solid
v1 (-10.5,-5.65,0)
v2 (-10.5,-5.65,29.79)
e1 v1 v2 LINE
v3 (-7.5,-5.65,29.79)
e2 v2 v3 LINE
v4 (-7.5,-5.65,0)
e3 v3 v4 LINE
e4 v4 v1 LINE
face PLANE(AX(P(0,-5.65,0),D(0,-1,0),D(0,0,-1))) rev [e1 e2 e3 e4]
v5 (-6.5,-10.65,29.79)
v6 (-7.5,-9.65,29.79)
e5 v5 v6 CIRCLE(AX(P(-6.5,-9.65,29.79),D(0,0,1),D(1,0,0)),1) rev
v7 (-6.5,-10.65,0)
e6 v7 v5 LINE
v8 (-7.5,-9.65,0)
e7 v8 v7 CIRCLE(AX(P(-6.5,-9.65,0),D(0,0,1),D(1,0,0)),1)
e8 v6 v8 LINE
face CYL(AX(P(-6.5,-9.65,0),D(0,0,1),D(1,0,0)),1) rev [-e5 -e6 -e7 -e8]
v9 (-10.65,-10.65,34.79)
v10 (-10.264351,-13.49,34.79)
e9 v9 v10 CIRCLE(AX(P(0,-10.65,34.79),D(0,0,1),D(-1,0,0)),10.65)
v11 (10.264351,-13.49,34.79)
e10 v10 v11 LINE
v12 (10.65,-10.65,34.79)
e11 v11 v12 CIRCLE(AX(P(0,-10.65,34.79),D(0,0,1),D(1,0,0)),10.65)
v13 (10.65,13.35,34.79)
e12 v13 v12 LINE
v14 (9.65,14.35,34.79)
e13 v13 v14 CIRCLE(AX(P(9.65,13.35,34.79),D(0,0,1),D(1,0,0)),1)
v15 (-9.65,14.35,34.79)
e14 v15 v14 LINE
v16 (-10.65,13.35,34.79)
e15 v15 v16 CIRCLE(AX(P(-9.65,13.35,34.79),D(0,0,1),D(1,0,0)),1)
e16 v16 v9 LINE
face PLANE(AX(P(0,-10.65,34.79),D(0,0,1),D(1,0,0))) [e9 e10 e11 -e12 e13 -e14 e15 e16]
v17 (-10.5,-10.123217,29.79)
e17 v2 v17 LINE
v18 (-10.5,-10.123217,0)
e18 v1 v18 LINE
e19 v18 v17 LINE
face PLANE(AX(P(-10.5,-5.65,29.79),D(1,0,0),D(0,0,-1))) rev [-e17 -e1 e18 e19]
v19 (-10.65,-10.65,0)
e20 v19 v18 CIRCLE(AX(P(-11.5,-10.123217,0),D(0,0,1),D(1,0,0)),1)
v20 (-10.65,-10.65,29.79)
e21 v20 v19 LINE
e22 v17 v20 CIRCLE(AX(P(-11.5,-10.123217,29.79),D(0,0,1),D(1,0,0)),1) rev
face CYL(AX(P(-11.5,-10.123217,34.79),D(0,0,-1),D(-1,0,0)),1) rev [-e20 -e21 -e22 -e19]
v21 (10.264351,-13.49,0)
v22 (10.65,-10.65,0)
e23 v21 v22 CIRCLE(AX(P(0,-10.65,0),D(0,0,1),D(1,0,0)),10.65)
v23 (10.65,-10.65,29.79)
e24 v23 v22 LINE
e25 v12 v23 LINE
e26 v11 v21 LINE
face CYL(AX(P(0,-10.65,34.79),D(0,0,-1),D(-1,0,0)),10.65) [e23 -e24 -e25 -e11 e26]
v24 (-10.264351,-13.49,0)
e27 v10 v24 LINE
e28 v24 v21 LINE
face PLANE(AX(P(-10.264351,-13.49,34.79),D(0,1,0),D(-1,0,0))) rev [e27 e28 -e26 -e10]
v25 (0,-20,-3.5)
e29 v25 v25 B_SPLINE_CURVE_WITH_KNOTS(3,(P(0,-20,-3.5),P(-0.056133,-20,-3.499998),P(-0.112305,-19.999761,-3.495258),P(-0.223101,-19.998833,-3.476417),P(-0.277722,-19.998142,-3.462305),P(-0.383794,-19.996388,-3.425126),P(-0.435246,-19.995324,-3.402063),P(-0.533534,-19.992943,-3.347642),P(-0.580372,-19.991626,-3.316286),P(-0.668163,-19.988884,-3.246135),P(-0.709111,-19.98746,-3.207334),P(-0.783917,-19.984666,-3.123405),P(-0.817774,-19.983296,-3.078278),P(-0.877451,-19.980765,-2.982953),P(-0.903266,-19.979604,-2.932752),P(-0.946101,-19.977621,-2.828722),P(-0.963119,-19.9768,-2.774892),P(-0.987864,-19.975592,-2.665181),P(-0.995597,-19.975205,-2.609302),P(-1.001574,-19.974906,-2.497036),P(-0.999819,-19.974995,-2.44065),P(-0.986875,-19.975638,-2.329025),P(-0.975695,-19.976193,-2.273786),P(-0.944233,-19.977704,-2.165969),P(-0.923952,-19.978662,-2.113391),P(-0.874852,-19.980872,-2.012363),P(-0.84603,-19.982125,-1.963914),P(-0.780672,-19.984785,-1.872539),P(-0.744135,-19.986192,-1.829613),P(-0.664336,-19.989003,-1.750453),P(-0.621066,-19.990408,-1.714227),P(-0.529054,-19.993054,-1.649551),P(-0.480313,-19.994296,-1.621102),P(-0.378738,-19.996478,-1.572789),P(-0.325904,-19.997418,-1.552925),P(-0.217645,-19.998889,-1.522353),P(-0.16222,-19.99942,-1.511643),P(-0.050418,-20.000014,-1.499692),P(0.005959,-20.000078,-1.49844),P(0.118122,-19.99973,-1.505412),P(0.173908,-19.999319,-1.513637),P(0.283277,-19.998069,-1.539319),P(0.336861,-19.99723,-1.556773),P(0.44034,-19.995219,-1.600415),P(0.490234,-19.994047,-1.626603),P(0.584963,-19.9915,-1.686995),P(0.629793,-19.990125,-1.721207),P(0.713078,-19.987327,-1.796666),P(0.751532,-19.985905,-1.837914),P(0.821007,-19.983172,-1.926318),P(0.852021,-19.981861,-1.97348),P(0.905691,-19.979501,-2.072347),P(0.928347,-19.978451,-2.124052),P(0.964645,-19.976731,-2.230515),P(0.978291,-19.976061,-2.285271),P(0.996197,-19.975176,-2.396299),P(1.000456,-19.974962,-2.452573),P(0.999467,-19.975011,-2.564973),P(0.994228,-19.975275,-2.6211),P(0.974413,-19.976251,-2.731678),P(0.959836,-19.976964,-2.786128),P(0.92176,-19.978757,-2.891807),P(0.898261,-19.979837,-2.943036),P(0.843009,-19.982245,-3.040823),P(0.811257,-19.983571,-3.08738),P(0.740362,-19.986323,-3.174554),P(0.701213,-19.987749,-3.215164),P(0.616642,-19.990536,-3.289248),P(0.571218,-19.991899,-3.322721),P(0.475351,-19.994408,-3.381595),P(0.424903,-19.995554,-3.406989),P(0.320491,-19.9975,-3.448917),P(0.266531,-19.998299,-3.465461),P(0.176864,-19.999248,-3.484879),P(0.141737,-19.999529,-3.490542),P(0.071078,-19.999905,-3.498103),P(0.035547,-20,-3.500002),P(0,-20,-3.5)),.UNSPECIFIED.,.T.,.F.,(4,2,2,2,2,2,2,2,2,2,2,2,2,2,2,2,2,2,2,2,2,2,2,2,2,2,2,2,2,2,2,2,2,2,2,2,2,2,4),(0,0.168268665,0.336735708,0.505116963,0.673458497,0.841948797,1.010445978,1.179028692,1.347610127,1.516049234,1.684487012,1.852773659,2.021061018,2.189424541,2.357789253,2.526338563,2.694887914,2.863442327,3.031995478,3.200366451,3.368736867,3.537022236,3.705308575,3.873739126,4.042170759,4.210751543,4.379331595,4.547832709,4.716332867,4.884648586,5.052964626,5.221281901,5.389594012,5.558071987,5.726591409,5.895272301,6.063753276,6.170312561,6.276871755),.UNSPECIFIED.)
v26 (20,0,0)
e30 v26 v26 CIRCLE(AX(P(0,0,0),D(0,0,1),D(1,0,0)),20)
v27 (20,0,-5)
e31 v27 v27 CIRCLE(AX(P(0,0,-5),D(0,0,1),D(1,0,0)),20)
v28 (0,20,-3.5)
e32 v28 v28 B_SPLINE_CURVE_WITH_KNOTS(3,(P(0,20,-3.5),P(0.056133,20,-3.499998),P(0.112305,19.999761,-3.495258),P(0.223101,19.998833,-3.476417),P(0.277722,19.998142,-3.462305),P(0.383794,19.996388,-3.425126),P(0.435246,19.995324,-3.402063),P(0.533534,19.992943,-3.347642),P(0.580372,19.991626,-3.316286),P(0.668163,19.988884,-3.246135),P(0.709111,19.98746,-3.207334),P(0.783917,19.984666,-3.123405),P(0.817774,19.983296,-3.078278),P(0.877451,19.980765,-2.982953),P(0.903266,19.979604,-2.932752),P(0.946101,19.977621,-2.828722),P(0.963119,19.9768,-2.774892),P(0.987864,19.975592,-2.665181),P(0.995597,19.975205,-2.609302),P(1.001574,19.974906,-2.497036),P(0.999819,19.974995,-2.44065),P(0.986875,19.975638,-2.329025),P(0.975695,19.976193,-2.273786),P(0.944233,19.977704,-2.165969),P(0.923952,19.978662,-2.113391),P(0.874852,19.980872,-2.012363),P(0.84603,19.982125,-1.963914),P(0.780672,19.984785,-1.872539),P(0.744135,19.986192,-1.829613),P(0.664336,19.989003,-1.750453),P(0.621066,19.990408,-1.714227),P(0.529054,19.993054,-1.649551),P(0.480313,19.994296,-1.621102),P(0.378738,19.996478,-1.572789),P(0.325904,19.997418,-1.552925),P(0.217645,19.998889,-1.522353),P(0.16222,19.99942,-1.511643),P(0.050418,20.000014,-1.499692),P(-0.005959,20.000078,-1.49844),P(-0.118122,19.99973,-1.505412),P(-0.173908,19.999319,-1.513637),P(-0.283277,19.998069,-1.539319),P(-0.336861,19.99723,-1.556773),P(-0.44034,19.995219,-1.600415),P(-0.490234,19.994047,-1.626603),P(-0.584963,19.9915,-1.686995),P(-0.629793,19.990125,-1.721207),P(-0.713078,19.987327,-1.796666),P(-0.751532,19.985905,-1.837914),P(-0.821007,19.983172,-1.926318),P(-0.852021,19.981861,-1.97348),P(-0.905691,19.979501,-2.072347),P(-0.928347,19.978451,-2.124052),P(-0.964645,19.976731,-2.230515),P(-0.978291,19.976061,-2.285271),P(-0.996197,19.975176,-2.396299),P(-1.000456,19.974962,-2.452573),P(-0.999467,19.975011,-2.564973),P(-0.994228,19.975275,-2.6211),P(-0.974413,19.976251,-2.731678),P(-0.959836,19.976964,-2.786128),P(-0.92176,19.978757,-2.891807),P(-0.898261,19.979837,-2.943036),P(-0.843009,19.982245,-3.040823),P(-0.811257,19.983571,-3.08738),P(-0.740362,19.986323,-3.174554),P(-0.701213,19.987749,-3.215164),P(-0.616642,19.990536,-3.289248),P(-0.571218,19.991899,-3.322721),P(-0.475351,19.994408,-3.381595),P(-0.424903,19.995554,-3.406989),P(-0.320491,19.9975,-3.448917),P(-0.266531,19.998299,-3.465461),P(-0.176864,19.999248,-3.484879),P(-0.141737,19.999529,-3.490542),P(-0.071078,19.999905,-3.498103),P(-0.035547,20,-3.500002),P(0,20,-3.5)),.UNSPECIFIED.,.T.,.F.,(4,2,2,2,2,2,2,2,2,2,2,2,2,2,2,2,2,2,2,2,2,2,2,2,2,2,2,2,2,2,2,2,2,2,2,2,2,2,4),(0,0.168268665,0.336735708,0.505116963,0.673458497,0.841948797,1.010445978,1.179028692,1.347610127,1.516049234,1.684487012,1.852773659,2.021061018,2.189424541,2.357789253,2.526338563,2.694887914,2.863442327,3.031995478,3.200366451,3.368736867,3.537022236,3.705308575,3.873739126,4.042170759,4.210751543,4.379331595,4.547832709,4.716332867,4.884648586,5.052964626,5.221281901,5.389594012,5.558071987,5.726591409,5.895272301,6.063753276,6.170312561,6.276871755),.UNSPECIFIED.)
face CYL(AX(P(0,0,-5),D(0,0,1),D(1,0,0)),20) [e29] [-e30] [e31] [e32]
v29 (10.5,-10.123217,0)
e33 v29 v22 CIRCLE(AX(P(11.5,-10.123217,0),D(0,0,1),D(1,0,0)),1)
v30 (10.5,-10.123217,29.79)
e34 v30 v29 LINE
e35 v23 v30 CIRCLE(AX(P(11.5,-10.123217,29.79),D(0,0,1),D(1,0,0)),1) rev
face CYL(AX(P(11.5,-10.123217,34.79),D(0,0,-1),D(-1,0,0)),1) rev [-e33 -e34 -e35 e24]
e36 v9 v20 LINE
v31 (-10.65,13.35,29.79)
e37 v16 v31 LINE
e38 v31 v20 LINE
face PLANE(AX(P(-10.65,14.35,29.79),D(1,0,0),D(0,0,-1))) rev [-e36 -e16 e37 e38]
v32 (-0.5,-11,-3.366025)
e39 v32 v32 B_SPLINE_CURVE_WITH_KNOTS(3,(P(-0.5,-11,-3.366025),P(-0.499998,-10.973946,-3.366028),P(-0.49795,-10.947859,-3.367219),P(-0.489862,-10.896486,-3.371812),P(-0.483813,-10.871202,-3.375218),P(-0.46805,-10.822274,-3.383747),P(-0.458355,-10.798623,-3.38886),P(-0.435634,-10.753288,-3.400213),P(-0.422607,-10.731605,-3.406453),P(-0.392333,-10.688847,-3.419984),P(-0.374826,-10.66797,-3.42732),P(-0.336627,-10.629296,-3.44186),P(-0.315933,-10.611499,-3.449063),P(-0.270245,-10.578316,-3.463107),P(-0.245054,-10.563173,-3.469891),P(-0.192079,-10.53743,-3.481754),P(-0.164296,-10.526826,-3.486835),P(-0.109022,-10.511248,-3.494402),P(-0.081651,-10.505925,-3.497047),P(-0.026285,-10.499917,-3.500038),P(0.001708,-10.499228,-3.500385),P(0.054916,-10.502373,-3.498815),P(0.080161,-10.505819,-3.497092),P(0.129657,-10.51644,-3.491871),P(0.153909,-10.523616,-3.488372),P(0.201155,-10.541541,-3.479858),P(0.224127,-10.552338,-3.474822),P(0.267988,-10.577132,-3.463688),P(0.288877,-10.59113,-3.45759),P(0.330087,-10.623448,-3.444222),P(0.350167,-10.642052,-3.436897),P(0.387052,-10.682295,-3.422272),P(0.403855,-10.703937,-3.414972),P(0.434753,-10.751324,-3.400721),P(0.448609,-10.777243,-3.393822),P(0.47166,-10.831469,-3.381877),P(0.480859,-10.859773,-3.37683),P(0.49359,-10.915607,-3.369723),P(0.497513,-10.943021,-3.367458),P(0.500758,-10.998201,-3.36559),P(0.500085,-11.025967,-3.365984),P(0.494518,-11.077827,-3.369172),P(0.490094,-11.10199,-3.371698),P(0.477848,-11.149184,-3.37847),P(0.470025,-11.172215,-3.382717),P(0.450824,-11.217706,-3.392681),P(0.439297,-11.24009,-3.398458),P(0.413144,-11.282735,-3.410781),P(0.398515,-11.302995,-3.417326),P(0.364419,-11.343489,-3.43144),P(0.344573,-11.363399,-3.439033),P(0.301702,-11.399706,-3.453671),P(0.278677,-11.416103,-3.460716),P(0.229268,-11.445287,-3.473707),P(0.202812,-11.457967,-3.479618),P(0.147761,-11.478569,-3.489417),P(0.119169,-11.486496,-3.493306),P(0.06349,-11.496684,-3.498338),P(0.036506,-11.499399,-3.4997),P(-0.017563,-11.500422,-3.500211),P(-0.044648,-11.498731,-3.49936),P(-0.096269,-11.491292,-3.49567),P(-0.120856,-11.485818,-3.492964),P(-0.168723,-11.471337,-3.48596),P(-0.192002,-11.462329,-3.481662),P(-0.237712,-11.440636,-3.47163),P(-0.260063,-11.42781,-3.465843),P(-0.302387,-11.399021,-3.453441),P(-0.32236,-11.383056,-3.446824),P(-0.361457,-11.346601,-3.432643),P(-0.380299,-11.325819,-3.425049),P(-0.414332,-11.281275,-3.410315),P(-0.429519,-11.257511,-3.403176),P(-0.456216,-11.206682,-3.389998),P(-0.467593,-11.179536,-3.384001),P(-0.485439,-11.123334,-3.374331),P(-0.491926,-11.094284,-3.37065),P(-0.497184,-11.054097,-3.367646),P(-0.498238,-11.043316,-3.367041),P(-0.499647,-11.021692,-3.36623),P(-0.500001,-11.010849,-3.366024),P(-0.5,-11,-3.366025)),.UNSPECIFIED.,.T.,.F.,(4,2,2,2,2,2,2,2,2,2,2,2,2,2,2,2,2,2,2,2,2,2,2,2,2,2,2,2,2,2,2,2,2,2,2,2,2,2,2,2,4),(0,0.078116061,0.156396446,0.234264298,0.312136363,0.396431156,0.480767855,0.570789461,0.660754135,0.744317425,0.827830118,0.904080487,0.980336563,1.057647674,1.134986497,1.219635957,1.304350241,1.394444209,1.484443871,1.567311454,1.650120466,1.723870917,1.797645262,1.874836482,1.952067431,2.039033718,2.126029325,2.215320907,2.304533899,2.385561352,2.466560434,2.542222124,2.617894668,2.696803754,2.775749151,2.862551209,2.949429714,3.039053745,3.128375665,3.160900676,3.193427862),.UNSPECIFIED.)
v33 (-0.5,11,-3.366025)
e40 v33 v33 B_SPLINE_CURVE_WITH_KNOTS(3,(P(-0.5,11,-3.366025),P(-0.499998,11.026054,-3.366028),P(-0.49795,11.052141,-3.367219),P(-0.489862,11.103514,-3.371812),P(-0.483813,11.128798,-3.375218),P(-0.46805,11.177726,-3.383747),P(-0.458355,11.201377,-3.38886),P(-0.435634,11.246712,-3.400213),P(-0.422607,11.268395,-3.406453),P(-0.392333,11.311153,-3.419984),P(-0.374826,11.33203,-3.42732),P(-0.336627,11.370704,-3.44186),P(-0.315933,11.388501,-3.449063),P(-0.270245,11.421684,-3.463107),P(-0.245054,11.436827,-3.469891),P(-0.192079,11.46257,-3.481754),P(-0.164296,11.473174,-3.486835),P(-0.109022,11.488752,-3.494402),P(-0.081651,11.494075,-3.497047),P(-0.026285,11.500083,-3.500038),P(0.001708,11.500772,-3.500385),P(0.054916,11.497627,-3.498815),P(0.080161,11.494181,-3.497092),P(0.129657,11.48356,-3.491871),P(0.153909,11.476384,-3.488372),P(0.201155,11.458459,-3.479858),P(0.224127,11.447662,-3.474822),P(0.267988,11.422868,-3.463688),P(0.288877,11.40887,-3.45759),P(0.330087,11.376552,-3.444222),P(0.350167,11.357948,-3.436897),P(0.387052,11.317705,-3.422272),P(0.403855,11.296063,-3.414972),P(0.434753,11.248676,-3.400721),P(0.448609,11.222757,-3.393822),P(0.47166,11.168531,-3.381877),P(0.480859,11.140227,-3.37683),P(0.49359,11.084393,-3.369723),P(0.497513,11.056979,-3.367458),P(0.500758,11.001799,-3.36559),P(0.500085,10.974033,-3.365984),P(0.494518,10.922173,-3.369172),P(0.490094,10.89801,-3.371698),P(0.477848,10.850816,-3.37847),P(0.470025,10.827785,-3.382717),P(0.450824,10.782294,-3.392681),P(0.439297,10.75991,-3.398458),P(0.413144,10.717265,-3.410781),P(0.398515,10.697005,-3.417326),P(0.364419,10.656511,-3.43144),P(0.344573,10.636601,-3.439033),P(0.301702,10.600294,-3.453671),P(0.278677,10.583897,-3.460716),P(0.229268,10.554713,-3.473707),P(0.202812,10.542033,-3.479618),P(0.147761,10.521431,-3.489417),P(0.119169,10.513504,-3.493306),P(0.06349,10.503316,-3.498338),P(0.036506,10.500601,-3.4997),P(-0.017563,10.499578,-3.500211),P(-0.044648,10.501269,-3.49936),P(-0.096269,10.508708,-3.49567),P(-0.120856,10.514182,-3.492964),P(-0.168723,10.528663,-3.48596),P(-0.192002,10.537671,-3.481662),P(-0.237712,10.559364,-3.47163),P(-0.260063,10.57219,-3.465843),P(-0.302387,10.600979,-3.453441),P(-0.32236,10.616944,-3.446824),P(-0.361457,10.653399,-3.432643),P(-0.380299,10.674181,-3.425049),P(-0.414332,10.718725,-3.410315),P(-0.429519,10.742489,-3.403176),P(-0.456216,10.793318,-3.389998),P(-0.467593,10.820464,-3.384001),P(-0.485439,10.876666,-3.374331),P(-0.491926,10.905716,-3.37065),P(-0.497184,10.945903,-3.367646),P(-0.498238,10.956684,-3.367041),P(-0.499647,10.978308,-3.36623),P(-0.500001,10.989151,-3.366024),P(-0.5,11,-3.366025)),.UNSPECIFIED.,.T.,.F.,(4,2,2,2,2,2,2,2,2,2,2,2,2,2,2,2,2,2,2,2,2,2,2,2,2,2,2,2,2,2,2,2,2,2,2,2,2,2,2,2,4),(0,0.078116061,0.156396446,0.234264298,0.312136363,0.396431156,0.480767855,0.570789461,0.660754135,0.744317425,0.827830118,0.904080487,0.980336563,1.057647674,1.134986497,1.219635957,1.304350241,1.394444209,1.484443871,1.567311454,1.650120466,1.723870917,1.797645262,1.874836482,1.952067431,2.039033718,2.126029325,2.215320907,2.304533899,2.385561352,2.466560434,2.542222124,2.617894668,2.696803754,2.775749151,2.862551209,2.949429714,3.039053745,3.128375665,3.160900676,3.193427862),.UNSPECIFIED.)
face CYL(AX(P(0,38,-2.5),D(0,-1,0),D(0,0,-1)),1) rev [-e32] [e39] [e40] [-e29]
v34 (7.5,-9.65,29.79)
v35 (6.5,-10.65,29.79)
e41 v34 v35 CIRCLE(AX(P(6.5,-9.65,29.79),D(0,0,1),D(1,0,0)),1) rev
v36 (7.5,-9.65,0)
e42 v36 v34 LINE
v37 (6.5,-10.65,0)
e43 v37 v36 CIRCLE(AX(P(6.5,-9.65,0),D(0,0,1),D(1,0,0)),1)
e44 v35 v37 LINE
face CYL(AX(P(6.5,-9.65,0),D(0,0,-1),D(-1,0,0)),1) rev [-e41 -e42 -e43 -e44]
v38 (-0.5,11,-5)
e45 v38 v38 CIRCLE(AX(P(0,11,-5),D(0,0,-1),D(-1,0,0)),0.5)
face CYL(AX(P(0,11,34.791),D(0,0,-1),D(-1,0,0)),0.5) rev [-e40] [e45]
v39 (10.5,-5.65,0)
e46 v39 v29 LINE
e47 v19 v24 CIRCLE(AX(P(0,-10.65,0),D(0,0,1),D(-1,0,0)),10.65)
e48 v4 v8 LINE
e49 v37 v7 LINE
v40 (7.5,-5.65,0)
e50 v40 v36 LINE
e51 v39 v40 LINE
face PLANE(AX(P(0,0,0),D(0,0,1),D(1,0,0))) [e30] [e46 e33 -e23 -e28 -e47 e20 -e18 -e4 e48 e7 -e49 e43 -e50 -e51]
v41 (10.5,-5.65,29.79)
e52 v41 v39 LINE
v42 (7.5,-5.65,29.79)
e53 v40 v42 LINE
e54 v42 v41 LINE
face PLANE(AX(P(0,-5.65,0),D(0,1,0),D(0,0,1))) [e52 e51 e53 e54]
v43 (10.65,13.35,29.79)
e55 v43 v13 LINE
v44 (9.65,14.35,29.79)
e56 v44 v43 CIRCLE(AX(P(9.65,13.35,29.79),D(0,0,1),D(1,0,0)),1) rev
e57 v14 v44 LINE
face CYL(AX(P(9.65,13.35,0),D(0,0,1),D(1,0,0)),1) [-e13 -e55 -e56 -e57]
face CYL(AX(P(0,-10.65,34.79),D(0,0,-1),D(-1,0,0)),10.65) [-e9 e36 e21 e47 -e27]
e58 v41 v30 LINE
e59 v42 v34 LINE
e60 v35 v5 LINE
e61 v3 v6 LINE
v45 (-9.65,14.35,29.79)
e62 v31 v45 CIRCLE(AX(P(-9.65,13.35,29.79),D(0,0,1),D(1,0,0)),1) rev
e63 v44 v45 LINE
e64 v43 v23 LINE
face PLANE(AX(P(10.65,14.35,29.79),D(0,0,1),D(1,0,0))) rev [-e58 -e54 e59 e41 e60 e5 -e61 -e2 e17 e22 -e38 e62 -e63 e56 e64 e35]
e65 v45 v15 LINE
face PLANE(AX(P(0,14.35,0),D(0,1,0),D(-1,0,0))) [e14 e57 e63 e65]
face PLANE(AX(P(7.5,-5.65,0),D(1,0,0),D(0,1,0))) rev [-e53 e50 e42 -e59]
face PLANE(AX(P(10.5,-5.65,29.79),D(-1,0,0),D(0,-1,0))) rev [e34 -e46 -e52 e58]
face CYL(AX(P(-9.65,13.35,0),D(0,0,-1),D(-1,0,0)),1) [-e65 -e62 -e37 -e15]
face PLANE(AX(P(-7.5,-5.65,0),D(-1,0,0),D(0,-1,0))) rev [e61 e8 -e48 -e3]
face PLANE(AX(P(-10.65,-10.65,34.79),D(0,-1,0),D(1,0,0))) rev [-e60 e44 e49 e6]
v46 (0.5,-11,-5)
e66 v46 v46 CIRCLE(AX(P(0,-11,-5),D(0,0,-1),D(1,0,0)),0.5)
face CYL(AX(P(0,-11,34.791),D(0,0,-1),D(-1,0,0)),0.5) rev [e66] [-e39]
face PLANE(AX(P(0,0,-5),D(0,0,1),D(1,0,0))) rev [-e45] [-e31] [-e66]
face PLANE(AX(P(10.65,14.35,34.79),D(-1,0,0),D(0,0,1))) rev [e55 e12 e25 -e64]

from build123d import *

# Parameters (mm, degrees)
SKETCH1_R               = 20
BOSS_EXTRUDE1_DEPTH     = 5
BOSS_EXTRUDE2_DEPTH     = 34.79
SKETCH3_W               = 21.3
SKETCH3_H               = 5
BOSS_EXTRUDE3_DEPTH     = 25
SKETCH4_W               = 3
SKETCH4_H               = 29.79
BOSS_EXTRUDE5_DEPTH     = 5
CUT_EXTRUDE1_DEPTH      = 38
CUT_EXTRUDE1_DEPTH_BACK = 45.836860952
SKETCH5_R               = 1
FILLET1_R               = 1
FILLET2_R               = 1
FILLET3_R               = 1
CUT_EXTRUDE2_REACH      = 50.818
CUT_EXTRUDE2_END_RADIUS = 1
SKETCH6_R               = 0.5


with BuildPart() as part:
    # Sketch1 → Boss-Extrude1 (new body)
    with BuildSketch(Plane.XY):
        Circle(SKETCH1_R)
    extrude(amount=-BOSS_EXTRUDE1_DEPTH)

    # Sketch2 → Boss-Extrude2 (add)
    with BuildSketch(Plane.XY):
        with BuildLine():
            Line((-10.65, -10.65), (10.65, -10.65))
            ThreePointArc((10.65, -10.65), (10.553147336, -12.083032205), (10.264350929, -13.49))
            Line((10.264350929, -13.49), (-10.264350929, -13.49))
            ThreePointArc((-10.264350929, -13.49), (-10.553147336, -12.083032205), (-10.65, -10.65))
        make_face()
    extrude(amount=BOSS_EXTRUDE2_DEPTH)

    # Sketch3 → Boss-Extrude3 (add)
    with BuildSketch(Plane(origin=(0, -10.65, 0), x_dir=(1, 0, 0), z_dir=(0, 1, 0))):
        with Locations((0, -32.29)):
            Rectangle(SKETCH3_W, SKETCH3_H)
    extrude(amount=BOSS_EXTRUDE3_DEPTH)

    # Sketch4 → Boss-Extrude5 (add)
    with BuildSketch(Plane(origin=(0, -10.65, 0), x_dir=(1, 0, 0), z_dir=(0, 1, 0))):
        with Locations((9, -14.895)):
            Rectangle(SKETCH4_W, SKETCH4_H)
        with Locations((-9, -14.895)):
            Rectangle(SKETCH4_W, SKETCH4_H)
    extrude(amount=BOSS_EXTRUDE5_DEPTH)

    # Sketch5 → Cut-Extrude1 (cut, two sides: drawn at the far end of the back side and taken through both)
    with BuildSketch(Plane(origin=(0, 0, 0), x_dir=(1, 0, 0), z_dir=(0, 1, 0)).offset(-CUT_EXTRUDE1_DEPTH_BACK)):
        with Locations(Location((0, 2.5, 0), (0, 0, 90))):
            Circle(SKETCH5_R)
    extrude(amount=CUT_EXTRUDE1_DEPTH + CUT_EXTRUDE1_DEPTH_BACK, mode=Mode.SUBTRACT)

    # Fillet1
    fillet1_edges = [part.edges().sort_by_distance(p)[0] for p in [
        (10.65, 14.35, 32.29),
        (-10.65, 14.35, 32.29),
    ]]
    fillet(fillet1_edges, radius=FILLET1_R)

    # Fillet2
    fillet2_edges = [part.edges().sort_by_distance(p)[0] for p in [
        (7.5, -10.65, 14.895),
        (-7.5, -10.65, 14.895),
    ]]
    fillet(fillet2_edges, radius=FILLET2_R)

    # Fillet3
    # the kernel refuses this fillet: 1 mm, written as the material it adds along each edge
    with BuildSketch(Plane(origin=(10.5, -10.65, 31.106956719), x_dir=(0, 1, 0), z_dir=(0, 0, -1))) as fillet3_piece_1:
        with BuildLine():
            CenterArc((0.526782688, 1), FILLET3_R, 238.211669382, 31.788330618)
            Line((0, 0.15), (-0.010535654, 0.133))
            ThreePointArc((-0.010535654, 0.133), (-0.02, 0.075), (-0.02, 0))
            Line((-0.02, 0), (0, -0.02))
            Line((0, -0.02), (0.526782688, -0.02))
            Line((0.526782688, -0.02), (0.526782688, 0))
        make_face()
    extrude(amount=32.423913438)
    with BuildSketch(Plane(origin=(-10.5, -10.65, 31.106956719), x_dir=(0, 1, 0), z_dir=(0, 0, -1))) as fillet3_piece_2:
        with BuildLine():
            CenterArc((0.526782688, -1), FILLET3_R, 90, 31.788330618)
            Line((0, -0.15), (-0.010535654, -0.133))
            ThreePointArc((-0.010535654, -0.133), (-0.02, -0.075), (-0.02, 0))
            Line((-0.02, 0), (0, 0.02))
            Line((0, 0.02), (0.526782688, 0.02))
            Line((0.526782688, 0.02), (0.526782688, 0))
        make_face()
    extrude(amount=32.423913438)

    # Cut-Extrude2: up to this cylinder (the profile starts outside it)
    cut_extrude2_end = Plane(origin=(0, 0, -2.5), z_dir=(0, -1, 0)) * Cylinder(CUT_EXTRUDE2_END_RADIUS, 126.636, mode=Mode.PRIVATE)
    # Sketch6 → Cut-Extrude2 (cut, up to the surface)
    with BuildSketch(Plane(origin=(0, 0, -5), x_dir=(-1, 0, 0), z_dir=(0, 0, -1)), mode=Mode.PRIVATE) as cut_extrude2_sk1:
        with Locations((0, 11)):
            Circle(SKETCH6_R)
    cut_extrude2_tool1 = extrude(cut_extrude2_sk1.sketch, amount=-CUT_EXTRUDE2_REACH, mode=Mode.PRIVATE) - cut_extrude2_end
    add(cut_extrude2_tool1.solids().sort_by_distance((0, 11, -5))[0], mode=Mode.SUBTRACT)
    # Sketch6 → Cut-Extrude2 (cut, up to the surface)
    with BuildSketch(Plane(origin=(0, 0, -5), x_dir=(-1, 0, 0), z_dir=(0, 0, -1)), mode=Mode.PRIVATE) as cut_extrude2_sk2:
        with Locations((0, -11)):
            Circle(SKETCH6_R)
    cut_extrude2_tool2 = extrude(cut_extrude2_sk2.sketch, amount=-CUT_EXTRUDE2_REACH, mode=Mode.PRIVATE) - cut_extrude2_end
    add(cut_extrude2_tool2.solids().sort_by_distance((0, -11, -5))[0], mode=Mode.SUBTRACT)


solid = part.part
